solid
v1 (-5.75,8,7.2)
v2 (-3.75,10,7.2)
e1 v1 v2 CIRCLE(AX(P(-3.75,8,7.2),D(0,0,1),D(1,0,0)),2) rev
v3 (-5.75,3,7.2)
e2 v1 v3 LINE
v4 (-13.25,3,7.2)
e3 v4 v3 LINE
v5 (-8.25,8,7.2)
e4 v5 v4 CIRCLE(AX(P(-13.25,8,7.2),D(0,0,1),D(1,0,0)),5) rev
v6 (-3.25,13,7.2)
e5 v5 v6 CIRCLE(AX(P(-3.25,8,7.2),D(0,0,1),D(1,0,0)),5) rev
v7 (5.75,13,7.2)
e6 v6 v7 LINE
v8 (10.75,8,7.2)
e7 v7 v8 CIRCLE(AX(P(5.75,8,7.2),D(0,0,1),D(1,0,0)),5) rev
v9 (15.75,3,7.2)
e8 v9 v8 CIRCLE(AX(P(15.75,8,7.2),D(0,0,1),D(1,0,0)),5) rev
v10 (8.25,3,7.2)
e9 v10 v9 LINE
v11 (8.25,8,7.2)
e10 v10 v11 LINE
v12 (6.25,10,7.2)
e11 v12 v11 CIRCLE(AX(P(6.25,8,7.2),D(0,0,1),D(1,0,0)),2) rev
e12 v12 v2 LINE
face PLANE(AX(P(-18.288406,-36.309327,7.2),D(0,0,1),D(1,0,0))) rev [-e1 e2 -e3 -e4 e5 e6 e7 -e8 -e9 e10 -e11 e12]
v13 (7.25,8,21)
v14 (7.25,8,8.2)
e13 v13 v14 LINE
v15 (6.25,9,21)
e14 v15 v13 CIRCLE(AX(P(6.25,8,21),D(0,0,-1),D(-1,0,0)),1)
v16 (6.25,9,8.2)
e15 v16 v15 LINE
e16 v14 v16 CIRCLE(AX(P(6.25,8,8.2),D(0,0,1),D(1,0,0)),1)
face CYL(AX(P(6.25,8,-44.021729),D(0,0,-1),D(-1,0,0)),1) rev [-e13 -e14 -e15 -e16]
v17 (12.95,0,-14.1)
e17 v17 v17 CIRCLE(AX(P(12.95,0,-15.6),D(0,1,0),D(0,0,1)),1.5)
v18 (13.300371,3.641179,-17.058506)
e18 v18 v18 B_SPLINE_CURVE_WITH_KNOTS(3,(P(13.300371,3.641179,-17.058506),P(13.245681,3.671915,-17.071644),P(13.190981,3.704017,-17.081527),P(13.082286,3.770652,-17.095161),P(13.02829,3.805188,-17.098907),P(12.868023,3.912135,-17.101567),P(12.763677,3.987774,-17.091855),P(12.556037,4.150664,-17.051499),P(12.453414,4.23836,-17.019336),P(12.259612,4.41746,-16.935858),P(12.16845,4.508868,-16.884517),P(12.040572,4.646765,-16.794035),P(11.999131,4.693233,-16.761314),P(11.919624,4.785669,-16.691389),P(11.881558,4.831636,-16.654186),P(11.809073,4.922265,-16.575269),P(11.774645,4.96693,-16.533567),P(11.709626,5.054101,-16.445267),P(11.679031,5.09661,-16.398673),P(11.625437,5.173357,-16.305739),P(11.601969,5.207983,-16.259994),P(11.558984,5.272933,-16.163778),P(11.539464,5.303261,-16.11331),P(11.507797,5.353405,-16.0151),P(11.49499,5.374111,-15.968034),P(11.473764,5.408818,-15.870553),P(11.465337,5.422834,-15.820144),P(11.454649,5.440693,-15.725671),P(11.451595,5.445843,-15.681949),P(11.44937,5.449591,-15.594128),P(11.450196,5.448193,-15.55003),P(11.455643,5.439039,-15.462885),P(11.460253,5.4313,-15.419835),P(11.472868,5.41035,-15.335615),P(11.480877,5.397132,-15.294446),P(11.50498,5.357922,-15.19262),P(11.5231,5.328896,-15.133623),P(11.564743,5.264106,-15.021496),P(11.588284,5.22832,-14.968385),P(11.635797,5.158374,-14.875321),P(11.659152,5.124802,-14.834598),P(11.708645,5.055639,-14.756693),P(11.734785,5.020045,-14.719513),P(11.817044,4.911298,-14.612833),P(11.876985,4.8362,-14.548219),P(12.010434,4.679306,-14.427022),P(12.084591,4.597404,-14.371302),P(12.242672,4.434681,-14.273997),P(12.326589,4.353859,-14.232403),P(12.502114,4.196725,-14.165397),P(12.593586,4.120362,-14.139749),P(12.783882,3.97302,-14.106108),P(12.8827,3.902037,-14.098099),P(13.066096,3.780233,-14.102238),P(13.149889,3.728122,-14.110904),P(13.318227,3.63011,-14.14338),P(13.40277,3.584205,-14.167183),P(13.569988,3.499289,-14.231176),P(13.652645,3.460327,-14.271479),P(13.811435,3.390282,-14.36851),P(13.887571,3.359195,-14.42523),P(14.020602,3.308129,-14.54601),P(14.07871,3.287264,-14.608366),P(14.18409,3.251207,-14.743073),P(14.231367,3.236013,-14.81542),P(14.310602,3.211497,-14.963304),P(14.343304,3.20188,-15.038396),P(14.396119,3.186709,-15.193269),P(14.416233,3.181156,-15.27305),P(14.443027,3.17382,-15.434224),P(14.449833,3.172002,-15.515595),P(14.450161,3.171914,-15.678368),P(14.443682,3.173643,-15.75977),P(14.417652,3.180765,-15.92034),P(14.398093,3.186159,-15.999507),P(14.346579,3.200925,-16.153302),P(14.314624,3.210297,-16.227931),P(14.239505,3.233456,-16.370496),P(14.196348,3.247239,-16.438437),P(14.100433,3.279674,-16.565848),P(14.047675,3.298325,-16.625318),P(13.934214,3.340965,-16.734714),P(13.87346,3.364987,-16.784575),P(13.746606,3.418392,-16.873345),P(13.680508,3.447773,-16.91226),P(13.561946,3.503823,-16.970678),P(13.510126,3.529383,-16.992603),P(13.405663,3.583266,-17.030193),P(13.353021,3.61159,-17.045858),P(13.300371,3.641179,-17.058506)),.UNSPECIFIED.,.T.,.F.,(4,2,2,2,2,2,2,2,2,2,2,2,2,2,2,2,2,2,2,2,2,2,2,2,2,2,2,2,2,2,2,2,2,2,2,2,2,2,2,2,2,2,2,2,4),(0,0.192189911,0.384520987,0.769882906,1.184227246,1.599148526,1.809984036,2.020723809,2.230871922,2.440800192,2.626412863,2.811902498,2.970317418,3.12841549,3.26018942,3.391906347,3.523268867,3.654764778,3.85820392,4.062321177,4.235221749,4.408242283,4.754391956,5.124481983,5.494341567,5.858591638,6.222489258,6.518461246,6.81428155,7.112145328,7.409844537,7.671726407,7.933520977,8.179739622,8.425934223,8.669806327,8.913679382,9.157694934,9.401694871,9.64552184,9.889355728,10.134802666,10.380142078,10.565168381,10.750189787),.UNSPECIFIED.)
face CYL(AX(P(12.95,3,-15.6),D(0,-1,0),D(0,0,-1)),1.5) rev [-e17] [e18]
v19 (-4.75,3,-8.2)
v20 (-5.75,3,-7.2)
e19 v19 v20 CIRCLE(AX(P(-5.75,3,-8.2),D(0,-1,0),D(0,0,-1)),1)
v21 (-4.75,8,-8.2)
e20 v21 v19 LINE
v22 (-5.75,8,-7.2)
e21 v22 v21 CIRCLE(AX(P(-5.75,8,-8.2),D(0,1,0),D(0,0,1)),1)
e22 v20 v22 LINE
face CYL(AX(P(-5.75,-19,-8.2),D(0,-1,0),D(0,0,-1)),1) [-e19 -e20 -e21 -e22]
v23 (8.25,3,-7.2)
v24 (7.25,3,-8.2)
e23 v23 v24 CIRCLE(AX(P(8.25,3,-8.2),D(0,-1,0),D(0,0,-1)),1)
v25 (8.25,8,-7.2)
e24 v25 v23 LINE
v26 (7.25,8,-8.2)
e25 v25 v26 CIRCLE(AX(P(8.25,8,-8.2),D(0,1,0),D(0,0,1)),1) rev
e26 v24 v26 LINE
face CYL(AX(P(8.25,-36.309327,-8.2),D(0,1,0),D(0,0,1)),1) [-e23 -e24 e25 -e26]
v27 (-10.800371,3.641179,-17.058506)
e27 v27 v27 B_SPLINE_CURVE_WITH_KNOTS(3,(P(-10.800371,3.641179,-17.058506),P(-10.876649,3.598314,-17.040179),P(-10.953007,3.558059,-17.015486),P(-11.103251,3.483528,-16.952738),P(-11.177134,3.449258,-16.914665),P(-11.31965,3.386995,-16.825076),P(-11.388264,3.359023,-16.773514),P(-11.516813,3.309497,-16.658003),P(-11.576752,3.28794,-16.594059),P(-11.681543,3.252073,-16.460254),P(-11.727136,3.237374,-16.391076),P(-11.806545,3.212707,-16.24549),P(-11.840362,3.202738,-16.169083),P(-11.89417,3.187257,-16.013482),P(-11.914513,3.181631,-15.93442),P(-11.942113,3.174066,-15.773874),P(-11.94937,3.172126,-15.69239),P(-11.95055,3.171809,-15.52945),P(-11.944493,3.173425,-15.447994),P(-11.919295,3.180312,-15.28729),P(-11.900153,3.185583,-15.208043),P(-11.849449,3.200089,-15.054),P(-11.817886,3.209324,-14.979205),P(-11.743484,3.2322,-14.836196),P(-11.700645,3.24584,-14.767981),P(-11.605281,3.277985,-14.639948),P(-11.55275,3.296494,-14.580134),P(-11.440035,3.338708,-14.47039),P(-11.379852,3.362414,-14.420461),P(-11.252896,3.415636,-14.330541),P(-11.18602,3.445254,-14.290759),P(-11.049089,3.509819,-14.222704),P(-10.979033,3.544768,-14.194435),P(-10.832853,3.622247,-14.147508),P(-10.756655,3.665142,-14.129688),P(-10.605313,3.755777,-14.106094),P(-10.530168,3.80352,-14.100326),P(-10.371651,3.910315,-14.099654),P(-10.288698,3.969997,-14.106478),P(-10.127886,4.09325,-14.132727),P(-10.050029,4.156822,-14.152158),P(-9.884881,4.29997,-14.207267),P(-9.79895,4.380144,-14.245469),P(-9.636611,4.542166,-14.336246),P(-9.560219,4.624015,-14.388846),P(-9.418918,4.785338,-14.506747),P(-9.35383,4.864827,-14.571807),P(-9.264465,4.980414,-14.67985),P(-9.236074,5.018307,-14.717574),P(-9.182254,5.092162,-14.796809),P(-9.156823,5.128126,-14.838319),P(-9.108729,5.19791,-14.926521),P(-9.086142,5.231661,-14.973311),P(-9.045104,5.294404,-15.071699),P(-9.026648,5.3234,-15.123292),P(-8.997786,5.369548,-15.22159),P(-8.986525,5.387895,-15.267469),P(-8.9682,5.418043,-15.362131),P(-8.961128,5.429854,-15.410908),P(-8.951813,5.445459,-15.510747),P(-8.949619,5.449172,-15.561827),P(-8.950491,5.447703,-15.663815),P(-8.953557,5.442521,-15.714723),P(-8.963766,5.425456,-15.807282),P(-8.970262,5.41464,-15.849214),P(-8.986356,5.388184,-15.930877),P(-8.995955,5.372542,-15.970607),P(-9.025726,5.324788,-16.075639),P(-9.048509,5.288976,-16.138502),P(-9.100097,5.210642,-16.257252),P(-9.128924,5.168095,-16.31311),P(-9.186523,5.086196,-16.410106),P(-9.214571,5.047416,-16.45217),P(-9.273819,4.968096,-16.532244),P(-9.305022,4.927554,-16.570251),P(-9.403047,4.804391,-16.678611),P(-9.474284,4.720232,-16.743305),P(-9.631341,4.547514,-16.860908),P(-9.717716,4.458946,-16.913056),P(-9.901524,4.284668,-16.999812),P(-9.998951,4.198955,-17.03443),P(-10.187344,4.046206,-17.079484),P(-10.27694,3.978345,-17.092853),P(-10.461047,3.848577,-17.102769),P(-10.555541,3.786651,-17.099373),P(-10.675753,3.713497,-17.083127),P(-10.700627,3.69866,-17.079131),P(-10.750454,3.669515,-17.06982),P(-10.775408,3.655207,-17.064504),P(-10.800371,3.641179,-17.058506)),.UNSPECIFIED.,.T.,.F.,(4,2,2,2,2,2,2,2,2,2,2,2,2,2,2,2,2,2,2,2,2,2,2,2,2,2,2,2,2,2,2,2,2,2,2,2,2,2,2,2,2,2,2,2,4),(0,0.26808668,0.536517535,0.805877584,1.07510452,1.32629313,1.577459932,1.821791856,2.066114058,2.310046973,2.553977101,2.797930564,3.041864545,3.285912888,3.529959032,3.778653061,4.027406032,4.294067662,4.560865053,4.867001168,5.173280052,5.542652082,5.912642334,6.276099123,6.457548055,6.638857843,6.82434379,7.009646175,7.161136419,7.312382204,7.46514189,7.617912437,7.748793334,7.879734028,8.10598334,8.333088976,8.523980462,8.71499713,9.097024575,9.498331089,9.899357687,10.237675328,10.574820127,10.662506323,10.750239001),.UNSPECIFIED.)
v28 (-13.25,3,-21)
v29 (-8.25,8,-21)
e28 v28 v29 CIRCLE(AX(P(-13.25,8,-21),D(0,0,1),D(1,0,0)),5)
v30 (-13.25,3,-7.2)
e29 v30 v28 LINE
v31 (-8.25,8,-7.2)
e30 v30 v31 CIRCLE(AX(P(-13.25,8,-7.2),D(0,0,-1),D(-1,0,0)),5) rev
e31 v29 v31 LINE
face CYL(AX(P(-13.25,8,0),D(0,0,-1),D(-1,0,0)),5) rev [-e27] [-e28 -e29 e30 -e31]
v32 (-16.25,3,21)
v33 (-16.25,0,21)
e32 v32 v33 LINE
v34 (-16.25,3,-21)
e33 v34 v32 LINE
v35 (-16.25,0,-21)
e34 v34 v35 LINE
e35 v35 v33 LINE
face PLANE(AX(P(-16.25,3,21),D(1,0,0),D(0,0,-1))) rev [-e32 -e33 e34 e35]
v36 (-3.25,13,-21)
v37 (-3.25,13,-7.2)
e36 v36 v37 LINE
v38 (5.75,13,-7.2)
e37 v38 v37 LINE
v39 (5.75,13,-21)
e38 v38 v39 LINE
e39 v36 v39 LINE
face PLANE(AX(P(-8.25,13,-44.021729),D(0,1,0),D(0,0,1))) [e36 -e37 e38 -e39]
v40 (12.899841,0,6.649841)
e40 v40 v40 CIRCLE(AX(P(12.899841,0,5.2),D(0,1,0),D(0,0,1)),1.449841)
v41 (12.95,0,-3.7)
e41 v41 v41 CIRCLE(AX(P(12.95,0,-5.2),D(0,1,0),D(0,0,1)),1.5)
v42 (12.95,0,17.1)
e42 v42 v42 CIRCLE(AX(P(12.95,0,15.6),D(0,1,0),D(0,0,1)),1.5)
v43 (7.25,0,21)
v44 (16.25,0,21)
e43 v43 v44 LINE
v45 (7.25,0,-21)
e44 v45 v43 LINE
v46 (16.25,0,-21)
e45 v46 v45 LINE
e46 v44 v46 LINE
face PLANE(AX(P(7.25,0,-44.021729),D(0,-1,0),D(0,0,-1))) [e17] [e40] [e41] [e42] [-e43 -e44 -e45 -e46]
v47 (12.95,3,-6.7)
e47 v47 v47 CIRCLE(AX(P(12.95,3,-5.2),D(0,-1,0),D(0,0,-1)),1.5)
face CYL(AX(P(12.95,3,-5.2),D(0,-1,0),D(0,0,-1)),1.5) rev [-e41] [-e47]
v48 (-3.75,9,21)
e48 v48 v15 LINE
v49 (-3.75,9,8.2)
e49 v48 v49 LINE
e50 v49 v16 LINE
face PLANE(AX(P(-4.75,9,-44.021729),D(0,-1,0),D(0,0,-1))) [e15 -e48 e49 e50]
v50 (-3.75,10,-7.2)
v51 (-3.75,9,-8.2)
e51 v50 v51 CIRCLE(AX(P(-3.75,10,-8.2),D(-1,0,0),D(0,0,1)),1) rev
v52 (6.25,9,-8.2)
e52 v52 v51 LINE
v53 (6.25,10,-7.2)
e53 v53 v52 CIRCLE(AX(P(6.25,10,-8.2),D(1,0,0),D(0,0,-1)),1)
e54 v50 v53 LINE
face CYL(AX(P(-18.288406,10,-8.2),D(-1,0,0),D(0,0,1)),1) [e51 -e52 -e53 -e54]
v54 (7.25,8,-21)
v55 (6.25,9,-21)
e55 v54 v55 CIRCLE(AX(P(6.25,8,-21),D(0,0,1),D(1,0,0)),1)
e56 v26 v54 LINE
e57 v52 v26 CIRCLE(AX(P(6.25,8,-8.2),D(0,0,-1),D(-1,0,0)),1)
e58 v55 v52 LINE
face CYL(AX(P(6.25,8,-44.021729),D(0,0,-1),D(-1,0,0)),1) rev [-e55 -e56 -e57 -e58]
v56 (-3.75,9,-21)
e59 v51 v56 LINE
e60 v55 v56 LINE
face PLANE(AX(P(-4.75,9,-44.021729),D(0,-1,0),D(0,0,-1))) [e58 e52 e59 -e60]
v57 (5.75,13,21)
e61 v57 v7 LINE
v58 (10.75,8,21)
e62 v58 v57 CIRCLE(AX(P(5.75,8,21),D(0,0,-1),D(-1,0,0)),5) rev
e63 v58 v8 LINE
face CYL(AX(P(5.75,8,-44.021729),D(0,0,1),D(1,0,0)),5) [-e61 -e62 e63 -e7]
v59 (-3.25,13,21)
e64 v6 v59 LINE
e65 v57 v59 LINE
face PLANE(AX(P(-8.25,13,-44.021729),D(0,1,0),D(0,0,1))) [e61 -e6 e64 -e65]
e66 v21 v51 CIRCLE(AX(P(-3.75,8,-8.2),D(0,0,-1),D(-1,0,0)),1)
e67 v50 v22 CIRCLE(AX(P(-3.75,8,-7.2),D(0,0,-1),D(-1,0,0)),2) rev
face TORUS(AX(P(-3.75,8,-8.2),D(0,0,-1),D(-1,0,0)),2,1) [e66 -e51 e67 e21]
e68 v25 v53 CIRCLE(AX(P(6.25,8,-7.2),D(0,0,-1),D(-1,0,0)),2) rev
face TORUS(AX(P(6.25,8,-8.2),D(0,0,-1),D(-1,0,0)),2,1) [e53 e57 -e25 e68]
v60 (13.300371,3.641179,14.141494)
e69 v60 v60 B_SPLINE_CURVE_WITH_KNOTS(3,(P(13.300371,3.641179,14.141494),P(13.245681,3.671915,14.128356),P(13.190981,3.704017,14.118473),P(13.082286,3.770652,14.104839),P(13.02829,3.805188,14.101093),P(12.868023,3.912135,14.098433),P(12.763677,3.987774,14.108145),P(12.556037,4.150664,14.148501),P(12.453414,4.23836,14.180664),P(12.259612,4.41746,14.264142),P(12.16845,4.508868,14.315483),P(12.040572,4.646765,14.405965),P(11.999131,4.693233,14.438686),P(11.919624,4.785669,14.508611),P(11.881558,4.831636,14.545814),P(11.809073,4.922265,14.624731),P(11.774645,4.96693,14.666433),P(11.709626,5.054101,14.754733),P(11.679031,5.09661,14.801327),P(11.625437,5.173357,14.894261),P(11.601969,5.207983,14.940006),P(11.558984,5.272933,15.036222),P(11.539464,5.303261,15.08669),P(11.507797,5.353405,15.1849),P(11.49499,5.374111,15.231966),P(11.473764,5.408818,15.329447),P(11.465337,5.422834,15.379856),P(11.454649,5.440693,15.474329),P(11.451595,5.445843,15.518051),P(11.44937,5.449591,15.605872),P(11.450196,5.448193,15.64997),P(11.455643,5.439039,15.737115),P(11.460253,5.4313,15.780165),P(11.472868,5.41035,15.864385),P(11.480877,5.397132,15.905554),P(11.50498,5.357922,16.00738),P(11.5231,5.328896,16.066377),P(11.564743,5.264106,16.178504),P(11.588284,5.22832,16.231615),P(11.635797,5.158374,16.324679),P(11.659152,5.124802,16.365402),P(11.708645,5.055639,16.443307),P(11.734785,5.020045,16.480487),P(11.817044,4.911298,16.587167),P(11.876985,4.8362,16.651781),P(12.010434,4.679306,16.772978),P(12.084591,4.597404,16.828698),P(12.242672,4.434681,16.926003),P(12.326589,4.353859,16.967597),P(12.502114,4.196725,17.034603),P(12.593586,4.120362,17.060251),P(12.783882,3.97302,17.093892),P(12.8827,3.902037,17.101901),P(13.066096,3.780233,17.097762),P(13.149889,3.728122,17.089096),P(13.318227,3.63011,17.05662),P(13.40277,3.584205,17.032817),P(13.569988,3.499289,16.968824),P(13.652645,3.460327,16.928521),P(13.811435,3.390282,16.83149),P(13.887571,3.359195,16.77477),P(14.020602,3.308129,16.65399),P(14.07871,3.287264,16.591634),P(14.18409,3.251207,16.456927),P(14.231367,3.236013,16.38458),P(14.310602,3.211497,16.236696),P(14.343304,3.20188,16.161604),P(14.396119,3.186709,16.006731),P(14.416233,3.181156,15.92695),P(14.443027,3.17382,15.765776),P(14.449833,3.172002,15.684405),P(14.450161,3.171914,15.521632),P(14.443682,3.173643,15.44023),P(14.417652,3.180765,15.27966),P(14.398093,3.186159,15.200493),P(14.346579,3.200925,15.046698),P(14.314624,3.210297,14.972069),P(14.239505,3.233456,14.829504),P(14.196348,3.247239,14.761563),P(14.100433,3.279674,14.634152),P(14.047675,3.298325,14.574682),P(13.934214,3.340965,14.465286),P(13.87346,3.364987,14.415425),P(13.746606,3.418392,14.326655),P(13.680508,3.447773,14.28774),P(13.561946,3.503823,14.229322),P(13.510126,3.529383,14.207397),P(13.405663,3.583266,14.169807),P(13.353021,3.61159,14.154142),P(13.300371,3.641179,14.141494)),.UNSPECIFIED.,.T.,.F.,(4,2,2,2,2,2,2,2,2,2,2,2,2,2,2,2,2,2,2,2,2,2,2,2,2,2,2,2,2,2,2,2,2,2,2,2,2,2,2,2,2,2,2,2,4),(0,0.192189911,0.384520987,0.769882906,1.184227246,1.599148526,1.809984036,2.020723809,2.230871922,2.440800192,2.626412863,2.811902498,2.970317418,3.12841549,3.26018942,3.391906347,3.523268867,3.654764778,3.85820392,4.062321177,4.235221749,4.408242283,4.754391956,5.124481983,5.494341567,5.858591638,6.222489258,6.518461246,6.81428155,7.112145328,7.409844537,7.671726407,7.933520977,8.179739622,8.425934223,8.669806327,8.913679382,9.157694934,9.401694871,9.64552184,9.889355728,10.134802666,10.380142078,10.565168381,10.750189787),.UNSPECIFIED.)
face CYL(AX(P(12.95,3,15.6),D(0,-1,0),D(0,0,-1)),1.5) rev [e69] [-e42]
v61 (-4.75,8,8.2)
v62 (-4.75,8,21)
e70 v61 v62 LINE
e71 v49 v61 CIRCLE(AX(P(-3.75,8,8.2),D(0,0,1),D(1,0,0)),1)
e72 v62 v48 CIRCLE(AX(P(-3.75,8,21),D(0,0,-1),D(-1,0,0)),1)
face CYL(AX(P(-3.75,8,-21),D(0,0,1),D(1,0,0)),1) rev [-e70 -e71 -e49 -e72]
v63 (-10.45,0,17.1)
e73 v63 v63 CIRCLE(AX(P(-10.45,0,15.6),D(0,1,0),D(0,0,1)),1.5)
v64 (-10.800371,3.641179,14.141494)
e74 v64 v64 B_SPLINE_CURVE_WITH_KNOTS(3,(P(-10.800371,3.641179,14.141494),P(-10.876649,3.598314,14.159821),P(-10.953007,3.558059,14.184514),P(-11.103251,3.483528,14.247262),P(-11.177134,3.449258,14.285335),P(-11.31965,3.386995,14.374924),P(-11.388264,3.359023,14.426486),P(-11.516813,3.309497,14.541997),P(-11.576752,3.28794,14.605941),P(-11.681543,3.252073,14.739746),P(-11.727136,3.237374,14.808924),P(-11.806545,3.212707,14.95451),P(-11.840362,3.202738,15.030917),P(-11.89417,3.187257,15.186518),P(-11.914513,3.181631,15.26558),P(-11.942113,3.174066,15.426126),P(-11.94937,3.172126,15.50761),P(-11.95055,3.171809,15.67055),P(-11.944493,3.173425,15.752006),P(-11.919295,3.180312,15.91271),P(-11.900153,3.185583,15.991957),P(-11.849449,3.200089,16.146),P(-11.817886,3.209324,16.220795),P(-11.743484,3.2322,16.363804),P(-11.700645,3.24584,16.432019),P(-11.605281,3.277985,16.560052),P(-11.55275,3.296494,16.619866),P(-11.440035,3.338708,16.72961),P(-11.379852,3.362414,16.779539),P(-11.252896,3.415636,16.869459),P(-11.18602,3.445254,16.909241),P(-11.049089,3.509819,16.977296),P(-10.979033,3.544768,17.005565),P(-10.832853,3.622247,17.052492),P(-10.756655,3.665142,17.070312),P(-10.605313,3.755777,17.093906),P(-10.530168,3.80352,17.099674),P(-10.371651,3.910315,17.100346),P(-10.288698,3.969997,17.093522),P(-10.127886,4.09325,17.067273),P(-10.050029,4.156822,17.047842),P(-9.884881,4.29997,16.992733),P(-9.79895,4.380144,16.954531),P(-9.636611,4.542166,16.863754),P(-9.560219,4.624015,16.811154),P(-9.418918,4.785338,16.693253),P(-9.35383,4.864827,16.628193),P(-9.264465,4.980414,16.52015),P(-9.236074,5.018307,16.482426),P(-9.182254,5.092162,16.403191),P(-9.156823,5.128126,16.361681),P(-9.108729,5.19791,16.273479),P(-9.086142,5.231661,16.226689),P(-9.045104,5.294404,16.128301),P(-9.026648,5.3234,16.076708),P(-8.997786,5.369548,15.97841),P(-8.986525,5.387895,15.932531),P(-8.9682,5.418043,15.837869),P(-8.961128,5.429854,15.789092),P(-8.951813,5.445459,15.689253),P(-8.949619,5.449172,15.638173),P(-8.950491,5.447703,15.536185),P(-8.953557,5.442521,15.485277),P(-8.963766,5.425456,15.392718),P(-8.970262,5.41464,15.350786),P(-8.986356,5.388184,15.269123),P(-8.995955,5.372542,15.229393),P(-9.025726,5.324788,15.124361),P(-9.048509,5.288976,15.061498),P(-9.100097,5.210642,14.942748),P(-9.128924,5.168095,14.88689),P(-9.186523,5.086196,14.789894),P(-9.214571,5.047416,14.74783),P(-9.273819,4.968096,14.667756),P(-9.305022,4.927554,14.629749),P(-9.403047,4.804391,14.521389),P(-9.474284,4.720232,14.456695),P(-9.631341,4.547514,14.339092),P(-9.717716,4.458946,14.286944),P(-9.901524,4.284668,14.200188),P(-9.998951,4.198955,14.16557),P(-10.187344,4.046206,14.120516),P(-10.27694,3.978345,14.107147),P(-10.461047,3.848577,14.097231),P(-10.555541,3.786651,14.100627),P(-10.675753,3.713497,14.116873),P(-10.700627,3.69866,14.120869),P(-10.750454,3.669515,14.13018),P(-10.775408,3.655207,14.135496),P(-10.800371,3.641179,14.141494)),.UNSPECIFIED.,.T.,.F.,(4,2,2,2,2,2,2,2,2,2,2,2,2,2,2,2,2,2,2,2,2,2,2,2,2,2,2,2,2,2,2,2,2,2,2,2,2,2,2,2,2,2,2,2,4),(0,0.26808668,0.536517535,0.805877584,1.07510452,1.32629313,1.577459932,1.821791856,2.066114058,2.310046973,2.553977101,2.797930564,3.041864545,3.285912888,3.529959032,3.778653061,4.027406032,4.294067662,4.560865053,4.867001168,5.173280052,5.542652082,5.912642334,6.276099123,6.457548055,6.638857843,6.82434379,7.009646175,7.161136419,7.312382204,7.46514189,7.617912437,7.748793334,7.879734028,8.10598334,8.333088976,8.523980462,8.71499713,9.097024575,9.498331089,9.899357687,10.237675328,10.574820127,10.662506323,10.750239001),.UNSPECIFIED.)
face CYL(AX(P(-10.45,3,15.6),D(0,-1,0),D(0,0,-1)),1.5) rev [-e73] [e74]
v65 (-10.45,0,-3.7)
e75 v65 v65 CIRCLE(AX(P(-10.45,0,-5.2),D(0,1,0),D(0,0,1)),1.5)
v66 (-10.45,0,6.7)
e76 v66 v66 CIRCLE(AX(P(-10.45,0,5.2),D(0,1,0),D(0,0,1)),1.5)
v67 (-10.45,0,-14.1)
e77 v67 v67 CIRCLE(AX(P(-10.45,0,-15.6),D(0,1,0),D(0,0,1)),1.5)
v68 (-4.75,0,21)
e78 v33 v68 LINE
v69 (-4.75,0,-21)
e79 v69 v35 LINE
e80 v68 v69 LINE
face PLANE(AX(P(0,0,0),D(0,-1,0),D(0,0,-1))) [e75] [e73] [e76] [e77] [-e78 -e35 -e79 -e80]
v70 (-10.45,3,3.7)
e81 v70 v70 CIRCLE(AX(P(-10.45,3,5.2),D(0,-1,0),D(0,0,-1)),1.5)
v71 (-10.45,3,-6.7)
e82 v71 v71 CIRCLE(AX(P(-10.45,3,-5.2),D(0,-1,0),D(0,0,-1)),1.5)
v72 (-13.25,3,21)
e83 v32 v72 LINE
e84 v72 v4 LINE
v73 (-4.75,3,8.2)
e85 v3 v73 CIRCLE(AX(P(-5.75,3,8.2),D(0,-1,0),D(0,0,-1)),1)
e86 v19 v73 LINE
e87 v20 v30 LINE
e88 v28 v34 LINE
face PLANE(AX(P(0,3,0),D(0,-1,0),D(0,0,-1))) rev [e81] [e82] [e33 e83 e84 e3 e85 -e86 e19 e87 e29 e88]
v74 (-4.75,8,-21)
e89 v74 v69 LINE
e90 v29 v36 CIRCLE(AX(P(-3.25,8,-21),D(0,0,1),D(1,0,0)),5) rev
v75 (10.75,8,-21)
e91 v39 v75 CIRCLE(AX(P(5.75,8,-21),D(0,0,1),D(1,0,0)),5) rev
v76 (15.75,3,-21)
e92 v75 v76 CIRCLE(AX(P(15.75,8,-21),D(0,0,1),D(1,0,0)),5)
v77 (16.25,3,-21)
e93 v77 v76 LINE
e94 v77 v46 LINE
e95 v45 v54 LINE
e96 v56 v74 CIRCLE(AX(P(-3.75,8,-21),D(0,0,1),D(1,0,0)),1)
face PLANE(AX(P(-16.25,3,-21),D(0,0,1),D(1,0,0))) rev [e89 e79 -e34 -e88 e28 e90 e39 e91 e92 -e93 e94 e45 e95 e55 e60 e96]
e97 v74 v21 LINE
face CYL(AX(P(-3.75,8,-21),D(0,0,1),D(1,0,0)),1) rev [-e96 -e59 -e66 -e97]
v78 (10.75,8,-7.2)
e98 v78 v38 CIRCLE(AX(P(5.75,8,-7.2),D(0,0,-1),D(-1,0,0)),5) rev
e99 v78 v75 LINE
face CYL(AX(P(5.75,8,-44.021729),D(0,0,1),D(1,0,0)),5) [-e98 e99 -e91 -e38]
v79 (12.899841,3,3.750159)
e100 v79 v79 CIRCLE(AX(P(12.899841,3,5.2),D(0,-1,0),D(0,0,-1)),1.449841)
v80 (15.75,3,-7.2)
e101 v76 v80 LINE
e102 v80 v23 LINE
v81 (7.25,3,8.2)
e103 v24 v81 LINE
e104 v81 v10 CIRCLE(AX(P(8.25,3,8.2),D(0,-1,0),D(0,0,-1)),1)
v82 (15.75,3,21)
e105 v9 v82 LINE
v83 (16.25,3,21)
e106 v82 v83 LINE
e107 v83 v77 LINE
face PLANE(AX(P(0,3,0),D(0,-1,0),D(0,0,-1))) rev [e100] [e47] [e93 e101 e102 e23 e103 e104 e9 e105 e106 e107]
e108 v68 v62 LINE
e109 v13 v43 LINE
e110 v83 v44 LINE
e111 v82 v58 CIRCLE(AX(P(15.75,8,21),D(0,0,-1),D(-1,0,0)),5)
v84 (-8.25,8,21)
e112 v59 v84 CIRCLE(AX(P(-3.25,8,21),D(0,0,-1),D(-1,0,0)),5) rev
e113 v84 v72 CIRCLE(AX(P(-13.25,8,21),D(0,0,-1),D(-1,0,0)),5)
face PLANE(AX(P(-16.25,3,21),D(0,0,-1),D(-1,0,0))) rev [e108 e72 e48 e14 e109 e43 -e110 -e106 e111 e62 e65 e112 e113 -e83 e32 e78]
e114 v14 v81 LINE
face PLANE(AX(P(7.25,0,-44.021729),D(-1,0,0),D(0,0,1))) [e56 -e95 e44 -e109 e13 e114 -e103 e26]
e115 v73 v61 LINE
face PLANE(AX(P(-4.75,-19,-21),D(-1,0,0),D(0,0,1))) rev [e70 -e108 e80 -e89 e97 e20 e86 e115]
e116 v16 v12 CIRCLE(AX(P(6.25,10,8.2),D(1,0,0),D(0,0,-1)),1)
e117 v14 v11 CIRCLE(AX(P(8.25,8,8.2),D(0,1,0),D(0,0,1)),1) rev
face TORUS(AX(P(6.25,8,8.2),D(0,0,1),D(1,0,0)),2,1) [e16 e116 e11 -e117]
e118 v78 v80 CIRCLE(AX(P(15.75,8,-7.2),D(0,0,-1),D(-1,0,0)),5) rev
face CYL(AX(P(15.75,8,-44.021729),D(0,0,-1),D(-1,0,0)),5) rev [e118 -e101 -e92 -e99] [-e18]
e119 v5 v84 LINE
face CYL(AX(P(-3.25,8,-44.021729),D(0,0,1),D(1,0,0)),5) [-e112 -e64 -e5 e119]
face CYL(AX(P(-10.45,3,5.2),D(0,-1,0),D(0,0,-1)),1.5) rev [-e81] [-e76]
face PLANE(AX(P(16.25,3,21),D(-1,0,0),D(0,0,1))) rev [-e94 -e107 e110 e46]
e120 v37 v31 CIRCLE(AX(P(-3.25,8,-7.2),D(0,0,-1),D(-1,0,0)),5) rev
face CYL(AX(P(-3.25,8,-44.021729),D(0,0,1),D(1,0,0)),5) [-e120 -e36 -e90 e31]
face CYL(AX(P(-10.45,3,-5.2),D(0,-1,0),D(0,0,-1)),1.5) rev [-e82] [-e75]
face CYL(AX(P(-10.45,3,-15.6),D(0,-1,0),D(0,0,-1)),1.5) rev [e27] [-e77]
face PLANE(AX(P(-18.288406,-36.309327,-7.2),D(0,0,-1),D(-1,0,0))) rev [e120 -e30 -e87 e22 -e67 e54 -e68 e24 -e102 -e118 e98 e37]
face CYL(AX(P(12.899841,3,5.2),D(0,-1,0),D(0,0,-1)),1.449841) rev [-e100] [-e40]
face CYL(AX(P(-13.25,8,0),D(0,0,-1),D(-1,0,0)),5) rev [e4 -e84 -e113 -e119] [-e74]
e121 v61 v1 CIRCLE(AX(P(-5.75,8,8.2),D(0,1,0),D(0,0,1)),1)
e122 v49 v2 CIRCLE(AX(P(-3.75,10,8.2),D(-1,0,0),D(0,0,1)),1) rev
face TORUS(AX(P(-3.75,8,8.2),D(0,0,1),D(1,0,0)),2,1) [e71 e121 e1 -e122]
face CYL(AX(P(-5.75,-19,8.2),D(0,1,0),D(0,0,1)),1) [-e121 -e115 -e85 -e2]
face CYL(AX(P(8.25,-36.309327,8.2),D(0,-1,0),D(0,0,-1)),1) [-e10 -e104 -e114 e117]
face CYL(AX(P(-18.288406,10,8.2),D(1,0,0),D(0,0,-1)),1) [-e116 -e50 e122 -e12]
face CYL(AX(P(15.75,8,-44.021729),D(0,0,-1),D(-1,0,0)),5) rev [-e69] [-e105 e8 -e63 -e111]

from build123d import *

# Parameters (mm, degrees)
SKETCH_2_W             = 32.5
SKETCH_2_H             = 42
SKETCH_2_R             = 1.5
SKETCH_2_R_2           = 1.449840903
EXTRUDE_1_DEPTH        = 3
SKETCH_4_W             = 12
SKETCH_4_H             = 42
CUT_EXTRUDE_1_DEPTH    = 22
EXTRUDE_2_DEPTH        = 42
FILLET_START           = 8
FILLET_1_OUTLINE_W     = 19
FILLET_1_OUTLINE_H     = 42
FILLET_1_DEPTH         = 5
FILLET_START_2         = -21
FILLET_1_2_DEPTH       = 42
FILLET_START_3         = 3
FILLET_1_3_OUTLINE_R   = 1.5
FILLET_1_3_OUTLINE_R_2 = 1.449840903
FILLET_1_3_DEPTH       = 5
CUT_EXTRUDE_2_REACH    = 31.565
SKETCH_6_W             = 36.57681216
SKETCH_6_H             = 14.4
FILLET_2_R             = 1


with BuildPart() as part:
    # Эскиз2 → Бобышка-Вытянуть1 (new body)
    with BuildSketch(Plane(origin=(0, 0, 0), x_dir=(1, 0, 0), z_dir=(0, 1, 0))):
        Rectangle(SKETCH_2_W, SKETCH_2_H)
        with Locations(Location((-10.45, -15.6, 0), (0, 0, 270))):
            Circle(SKETCH_2_R, mode=Mode.SUBTRACT)
        with Locations(Location((-10.45, -5.2, 0), (0, 0, 270))):
            Circle(SKETCH_2_R, mode=Mode.SUBTRACT)
        with Locations(Location((-10.45, 5.2, 0), (0, 0, 270))):
            Circle(SKETCH_2_R, mode=Mode.SUBTRACT)
        with Locations(Location((-10.45, 15.6, 0), (0, 0, 270))):
            Circle(SKETCH_2_R, mode=Mode.SUBTRACT)
        with Locations(Location((12.95, 15.6, 0), (0, 0, 270))):
            Circle(SKETCH_2_R, mode=Mode.SUBTRACT)
        with Locations(Location((12.95, 5.2, 0), (0, 0, 270))):
            Circle(SKETCH_2_R, mode=Mode.SUBTRACT)
        with Locations(Location((12.899840903, -5.2, 0), (0, 0, 270))):
            Circle(SKETCH_2_R_2, mode=Mode.SUBTRACT)
        with Locations(Location((12.95, -15.6, 0), (0, 0, 270))):
            Circle(SKETCH_2_R, mode=Mode.SUBTRACT)
    extrude(amount=EXTRUDE_1_DEPTH)

    # Эскиз4 → Вырез-Вытянуть1 (cut)
    with BuildSketch(Plane(origin=(0, 3, 0), x_dir=(1, 0, 0), z_dir=(0, 1, 0))):
        with Locations((1.25, 0)):
            Rectangle(SKETCH_4_W, SKETCH_4_H)
    extrude(amount=-CUT_EXTRUDE_1_DEPTH, mode=Mode.SUBTRACT)


with BuildPart() as cut_extrude_1_piece_1:
    # of the separate pieces the step leaves, piece 1, a body of its own (cut_extrude_1_pieces)
    add(part.part.solids().sort_by_distance((-16.25, 0, 21))[0])



with BuildPart() as cut_extrude_1_piece_2:
    # of the separate pieces the step leaves, piece 2, a body of its own (cut_extrude_1_pieces)
    add(part.part.solids().sort_by_distance((7.25, 0, 21))[0])


with BuildPart() as cut_extrude_1_piece_1_1:
    add(cut_extrude_1_piece_1.part)

    add(cut_extrude_1_piece_2.part)  # Бобышка-Вытянуть2 merges Вырез-Вытянуть1 piece 2
    # Эскиз5 → Бобышка-Вытянуть2 (add)
    with BuildSketch(Plane.XY.offset(21)):
        Polygon((-4.75, 0), (-4.75, 3), (-4.75, 9), (7.25, 9), (7.25, 3), (7.25, 0), (10.75, 0), (10.75, 13), (-8.25, 13), (-8.25, 0), align=None)
    extrude(amount=-EXTRUDE_2_DEPTH)

    # Скругление1: read off the stored shape, not the designer's step
    # Скругление1 outline → Скругление1 (cut)
    with BuildSketch(Plane(origin=(0, 0, 0), x_dir=(1, 0, 0), z_dir=(0, 1, 0)).offset(FILLET_START)):
        with Locations((1.25, 0)):
            Rectangle(FILLET_1_OUTLINE_W, FILLET_1_OUTLINE_H)
    extrude(amount=FILLET_1_DEPTH, mode=Mode.SUBTRACT)

    # Fillet 1 2 outline → Fillet 1 2 (add)
    with BuildSketch(Plane.XY.offset(FILLET_START_2)):
        with BuildLine():
            Line((-8.25, 3), (-8.25, 8))
            ThreePointArc((-8.25, 8), (-9.714466094, 4.464466094), (-13.25, 3))
            Line((-13.25, 3), (-8.25, 3))
        make_face()
        with BuildLine():
            ThreePointArc((15.75, 3), (12.214466094, 4.464466094), (10.75, 8))
            Line((10.75, 8), (10.75, 3))
            Line((10.75, 3), (15.75, 3))
        make_face()
        with BuildLine():
            Line((-4.75, 8), (-4.75, 9))
            Line((-4.75, 9), (7.25, 9))
            Line((7.25, 9), (7.25, 8))
            Line((7.25, 8), (10.75, 8))
            ThreePointArc((10.75, 8), (9.285533906, 11.535533906), (5.75, 13))
            Line((5.75, 13), (-3.25, 13))
            ThreePointArc((-3.25, 13), (-6.785533906, 11.535533906), (-8.25, 8))
            Line((-8.25, 8), (-4.75, 8))
        make_face()
    extrude(amount=FILLET_1_2_DEPTH)

    # Fillet 1 3 outline → Fillet 1 3 (cut)
    with BuildSketch(Plane(origin=(0, 0, 0), x_dir=(1, 0, 0), z_dir=(0, 1, 0)).offset(FILLET_START_3)):
        with Locations((-10.45, -15.6)):
            Circle(FILLET_1_3_OUTLINE_R)
        with Locations((-10.45, -5.2)):
            Circle(FILLET_1_3_OUTLINE_R)
        with Locations((-10.45, 5.2)):
            Circle(FILLET_1_3_OUTLINE_R)
        with Locations((-10.45, 15.6)):
            Circle(FILLET_1_3_OUTLINE_R)
        with Locations((12.899840903, -5.2)):
            Circle(FILLET_1_3_OUTLINE_R_2)
        with Locations((12.95, 15.6)):
            Circle(FILLET_1_3_OUTLINE_R)
        with Locations((12.95, 5.2)):
            Circle(FILLET_1_3_OUTLINE_R)
        with Locations((12.95, -15.6)):
            Circle(FILLET_1_3_OUTLINE_R)
    extrude(amount=FILLET_1_3_DEPTH, mode=Mode.SUBTRACT)

    # Вырез-Вытянуть2: up to this face of the body (flat: up to its plane)
    cut_extrude_2_end = Plane(cut_extrude_1_piece_1_1.part.faces().sort_by_distance((16, 3, 0))[0])
    # Эскиз6 → Вырез-Вытянуть2 (cut, up to the picked face)
    with BuildSketch(Plane(origin=(0, 13, 0), x_dir=(1, 0, 0), z_dir=(0, 1, 0)), mode=Mode.PRIVATE) as cut_extrude_2_sk1:
        Rectangle(SKETCH_6_W, SKETCH_6_H)
    cut_extrude_2_tool1 = split(extrude(cut_extrude_2_sk1.sketch, amount=-CUT_EXTRUDE_2_REACH, mode=Mode.PRIVATE), bisect_by=cut_extrude_2_end, keep=Keep.BOTH, mode=Mode.PRIVATE)
    add(cut_extrude_2_tool1.solids().sort_by(Axis((0, 13, 0), (0, -1, 0)))[0], mode=Mode.SUBTRACT)

    # Скругление2
    fillet_2_edges = [cut_extrude_1_piece_1_1.edges().sort_by_distance(p)[0] for p in [
        (7.25, 9, 14.1),
        (-4.75, 9, 14.1),
        (-4.75, 6, -7.2),
        (1.25, 9, -7.2),
        (7.25, 6, -7.2),
        (-4.75, 6, 7.2),
        (7.25, 6, 7.2),
        (1.25, 9, 7.2),
        (-4.75, 9, -14.1),
        (7.25, 9, -14.1),
    ]]
    fillet(fillet_2_edges, radius=FILLET_2_R)


solid = cut_extrude_1_piece_1_1.part
